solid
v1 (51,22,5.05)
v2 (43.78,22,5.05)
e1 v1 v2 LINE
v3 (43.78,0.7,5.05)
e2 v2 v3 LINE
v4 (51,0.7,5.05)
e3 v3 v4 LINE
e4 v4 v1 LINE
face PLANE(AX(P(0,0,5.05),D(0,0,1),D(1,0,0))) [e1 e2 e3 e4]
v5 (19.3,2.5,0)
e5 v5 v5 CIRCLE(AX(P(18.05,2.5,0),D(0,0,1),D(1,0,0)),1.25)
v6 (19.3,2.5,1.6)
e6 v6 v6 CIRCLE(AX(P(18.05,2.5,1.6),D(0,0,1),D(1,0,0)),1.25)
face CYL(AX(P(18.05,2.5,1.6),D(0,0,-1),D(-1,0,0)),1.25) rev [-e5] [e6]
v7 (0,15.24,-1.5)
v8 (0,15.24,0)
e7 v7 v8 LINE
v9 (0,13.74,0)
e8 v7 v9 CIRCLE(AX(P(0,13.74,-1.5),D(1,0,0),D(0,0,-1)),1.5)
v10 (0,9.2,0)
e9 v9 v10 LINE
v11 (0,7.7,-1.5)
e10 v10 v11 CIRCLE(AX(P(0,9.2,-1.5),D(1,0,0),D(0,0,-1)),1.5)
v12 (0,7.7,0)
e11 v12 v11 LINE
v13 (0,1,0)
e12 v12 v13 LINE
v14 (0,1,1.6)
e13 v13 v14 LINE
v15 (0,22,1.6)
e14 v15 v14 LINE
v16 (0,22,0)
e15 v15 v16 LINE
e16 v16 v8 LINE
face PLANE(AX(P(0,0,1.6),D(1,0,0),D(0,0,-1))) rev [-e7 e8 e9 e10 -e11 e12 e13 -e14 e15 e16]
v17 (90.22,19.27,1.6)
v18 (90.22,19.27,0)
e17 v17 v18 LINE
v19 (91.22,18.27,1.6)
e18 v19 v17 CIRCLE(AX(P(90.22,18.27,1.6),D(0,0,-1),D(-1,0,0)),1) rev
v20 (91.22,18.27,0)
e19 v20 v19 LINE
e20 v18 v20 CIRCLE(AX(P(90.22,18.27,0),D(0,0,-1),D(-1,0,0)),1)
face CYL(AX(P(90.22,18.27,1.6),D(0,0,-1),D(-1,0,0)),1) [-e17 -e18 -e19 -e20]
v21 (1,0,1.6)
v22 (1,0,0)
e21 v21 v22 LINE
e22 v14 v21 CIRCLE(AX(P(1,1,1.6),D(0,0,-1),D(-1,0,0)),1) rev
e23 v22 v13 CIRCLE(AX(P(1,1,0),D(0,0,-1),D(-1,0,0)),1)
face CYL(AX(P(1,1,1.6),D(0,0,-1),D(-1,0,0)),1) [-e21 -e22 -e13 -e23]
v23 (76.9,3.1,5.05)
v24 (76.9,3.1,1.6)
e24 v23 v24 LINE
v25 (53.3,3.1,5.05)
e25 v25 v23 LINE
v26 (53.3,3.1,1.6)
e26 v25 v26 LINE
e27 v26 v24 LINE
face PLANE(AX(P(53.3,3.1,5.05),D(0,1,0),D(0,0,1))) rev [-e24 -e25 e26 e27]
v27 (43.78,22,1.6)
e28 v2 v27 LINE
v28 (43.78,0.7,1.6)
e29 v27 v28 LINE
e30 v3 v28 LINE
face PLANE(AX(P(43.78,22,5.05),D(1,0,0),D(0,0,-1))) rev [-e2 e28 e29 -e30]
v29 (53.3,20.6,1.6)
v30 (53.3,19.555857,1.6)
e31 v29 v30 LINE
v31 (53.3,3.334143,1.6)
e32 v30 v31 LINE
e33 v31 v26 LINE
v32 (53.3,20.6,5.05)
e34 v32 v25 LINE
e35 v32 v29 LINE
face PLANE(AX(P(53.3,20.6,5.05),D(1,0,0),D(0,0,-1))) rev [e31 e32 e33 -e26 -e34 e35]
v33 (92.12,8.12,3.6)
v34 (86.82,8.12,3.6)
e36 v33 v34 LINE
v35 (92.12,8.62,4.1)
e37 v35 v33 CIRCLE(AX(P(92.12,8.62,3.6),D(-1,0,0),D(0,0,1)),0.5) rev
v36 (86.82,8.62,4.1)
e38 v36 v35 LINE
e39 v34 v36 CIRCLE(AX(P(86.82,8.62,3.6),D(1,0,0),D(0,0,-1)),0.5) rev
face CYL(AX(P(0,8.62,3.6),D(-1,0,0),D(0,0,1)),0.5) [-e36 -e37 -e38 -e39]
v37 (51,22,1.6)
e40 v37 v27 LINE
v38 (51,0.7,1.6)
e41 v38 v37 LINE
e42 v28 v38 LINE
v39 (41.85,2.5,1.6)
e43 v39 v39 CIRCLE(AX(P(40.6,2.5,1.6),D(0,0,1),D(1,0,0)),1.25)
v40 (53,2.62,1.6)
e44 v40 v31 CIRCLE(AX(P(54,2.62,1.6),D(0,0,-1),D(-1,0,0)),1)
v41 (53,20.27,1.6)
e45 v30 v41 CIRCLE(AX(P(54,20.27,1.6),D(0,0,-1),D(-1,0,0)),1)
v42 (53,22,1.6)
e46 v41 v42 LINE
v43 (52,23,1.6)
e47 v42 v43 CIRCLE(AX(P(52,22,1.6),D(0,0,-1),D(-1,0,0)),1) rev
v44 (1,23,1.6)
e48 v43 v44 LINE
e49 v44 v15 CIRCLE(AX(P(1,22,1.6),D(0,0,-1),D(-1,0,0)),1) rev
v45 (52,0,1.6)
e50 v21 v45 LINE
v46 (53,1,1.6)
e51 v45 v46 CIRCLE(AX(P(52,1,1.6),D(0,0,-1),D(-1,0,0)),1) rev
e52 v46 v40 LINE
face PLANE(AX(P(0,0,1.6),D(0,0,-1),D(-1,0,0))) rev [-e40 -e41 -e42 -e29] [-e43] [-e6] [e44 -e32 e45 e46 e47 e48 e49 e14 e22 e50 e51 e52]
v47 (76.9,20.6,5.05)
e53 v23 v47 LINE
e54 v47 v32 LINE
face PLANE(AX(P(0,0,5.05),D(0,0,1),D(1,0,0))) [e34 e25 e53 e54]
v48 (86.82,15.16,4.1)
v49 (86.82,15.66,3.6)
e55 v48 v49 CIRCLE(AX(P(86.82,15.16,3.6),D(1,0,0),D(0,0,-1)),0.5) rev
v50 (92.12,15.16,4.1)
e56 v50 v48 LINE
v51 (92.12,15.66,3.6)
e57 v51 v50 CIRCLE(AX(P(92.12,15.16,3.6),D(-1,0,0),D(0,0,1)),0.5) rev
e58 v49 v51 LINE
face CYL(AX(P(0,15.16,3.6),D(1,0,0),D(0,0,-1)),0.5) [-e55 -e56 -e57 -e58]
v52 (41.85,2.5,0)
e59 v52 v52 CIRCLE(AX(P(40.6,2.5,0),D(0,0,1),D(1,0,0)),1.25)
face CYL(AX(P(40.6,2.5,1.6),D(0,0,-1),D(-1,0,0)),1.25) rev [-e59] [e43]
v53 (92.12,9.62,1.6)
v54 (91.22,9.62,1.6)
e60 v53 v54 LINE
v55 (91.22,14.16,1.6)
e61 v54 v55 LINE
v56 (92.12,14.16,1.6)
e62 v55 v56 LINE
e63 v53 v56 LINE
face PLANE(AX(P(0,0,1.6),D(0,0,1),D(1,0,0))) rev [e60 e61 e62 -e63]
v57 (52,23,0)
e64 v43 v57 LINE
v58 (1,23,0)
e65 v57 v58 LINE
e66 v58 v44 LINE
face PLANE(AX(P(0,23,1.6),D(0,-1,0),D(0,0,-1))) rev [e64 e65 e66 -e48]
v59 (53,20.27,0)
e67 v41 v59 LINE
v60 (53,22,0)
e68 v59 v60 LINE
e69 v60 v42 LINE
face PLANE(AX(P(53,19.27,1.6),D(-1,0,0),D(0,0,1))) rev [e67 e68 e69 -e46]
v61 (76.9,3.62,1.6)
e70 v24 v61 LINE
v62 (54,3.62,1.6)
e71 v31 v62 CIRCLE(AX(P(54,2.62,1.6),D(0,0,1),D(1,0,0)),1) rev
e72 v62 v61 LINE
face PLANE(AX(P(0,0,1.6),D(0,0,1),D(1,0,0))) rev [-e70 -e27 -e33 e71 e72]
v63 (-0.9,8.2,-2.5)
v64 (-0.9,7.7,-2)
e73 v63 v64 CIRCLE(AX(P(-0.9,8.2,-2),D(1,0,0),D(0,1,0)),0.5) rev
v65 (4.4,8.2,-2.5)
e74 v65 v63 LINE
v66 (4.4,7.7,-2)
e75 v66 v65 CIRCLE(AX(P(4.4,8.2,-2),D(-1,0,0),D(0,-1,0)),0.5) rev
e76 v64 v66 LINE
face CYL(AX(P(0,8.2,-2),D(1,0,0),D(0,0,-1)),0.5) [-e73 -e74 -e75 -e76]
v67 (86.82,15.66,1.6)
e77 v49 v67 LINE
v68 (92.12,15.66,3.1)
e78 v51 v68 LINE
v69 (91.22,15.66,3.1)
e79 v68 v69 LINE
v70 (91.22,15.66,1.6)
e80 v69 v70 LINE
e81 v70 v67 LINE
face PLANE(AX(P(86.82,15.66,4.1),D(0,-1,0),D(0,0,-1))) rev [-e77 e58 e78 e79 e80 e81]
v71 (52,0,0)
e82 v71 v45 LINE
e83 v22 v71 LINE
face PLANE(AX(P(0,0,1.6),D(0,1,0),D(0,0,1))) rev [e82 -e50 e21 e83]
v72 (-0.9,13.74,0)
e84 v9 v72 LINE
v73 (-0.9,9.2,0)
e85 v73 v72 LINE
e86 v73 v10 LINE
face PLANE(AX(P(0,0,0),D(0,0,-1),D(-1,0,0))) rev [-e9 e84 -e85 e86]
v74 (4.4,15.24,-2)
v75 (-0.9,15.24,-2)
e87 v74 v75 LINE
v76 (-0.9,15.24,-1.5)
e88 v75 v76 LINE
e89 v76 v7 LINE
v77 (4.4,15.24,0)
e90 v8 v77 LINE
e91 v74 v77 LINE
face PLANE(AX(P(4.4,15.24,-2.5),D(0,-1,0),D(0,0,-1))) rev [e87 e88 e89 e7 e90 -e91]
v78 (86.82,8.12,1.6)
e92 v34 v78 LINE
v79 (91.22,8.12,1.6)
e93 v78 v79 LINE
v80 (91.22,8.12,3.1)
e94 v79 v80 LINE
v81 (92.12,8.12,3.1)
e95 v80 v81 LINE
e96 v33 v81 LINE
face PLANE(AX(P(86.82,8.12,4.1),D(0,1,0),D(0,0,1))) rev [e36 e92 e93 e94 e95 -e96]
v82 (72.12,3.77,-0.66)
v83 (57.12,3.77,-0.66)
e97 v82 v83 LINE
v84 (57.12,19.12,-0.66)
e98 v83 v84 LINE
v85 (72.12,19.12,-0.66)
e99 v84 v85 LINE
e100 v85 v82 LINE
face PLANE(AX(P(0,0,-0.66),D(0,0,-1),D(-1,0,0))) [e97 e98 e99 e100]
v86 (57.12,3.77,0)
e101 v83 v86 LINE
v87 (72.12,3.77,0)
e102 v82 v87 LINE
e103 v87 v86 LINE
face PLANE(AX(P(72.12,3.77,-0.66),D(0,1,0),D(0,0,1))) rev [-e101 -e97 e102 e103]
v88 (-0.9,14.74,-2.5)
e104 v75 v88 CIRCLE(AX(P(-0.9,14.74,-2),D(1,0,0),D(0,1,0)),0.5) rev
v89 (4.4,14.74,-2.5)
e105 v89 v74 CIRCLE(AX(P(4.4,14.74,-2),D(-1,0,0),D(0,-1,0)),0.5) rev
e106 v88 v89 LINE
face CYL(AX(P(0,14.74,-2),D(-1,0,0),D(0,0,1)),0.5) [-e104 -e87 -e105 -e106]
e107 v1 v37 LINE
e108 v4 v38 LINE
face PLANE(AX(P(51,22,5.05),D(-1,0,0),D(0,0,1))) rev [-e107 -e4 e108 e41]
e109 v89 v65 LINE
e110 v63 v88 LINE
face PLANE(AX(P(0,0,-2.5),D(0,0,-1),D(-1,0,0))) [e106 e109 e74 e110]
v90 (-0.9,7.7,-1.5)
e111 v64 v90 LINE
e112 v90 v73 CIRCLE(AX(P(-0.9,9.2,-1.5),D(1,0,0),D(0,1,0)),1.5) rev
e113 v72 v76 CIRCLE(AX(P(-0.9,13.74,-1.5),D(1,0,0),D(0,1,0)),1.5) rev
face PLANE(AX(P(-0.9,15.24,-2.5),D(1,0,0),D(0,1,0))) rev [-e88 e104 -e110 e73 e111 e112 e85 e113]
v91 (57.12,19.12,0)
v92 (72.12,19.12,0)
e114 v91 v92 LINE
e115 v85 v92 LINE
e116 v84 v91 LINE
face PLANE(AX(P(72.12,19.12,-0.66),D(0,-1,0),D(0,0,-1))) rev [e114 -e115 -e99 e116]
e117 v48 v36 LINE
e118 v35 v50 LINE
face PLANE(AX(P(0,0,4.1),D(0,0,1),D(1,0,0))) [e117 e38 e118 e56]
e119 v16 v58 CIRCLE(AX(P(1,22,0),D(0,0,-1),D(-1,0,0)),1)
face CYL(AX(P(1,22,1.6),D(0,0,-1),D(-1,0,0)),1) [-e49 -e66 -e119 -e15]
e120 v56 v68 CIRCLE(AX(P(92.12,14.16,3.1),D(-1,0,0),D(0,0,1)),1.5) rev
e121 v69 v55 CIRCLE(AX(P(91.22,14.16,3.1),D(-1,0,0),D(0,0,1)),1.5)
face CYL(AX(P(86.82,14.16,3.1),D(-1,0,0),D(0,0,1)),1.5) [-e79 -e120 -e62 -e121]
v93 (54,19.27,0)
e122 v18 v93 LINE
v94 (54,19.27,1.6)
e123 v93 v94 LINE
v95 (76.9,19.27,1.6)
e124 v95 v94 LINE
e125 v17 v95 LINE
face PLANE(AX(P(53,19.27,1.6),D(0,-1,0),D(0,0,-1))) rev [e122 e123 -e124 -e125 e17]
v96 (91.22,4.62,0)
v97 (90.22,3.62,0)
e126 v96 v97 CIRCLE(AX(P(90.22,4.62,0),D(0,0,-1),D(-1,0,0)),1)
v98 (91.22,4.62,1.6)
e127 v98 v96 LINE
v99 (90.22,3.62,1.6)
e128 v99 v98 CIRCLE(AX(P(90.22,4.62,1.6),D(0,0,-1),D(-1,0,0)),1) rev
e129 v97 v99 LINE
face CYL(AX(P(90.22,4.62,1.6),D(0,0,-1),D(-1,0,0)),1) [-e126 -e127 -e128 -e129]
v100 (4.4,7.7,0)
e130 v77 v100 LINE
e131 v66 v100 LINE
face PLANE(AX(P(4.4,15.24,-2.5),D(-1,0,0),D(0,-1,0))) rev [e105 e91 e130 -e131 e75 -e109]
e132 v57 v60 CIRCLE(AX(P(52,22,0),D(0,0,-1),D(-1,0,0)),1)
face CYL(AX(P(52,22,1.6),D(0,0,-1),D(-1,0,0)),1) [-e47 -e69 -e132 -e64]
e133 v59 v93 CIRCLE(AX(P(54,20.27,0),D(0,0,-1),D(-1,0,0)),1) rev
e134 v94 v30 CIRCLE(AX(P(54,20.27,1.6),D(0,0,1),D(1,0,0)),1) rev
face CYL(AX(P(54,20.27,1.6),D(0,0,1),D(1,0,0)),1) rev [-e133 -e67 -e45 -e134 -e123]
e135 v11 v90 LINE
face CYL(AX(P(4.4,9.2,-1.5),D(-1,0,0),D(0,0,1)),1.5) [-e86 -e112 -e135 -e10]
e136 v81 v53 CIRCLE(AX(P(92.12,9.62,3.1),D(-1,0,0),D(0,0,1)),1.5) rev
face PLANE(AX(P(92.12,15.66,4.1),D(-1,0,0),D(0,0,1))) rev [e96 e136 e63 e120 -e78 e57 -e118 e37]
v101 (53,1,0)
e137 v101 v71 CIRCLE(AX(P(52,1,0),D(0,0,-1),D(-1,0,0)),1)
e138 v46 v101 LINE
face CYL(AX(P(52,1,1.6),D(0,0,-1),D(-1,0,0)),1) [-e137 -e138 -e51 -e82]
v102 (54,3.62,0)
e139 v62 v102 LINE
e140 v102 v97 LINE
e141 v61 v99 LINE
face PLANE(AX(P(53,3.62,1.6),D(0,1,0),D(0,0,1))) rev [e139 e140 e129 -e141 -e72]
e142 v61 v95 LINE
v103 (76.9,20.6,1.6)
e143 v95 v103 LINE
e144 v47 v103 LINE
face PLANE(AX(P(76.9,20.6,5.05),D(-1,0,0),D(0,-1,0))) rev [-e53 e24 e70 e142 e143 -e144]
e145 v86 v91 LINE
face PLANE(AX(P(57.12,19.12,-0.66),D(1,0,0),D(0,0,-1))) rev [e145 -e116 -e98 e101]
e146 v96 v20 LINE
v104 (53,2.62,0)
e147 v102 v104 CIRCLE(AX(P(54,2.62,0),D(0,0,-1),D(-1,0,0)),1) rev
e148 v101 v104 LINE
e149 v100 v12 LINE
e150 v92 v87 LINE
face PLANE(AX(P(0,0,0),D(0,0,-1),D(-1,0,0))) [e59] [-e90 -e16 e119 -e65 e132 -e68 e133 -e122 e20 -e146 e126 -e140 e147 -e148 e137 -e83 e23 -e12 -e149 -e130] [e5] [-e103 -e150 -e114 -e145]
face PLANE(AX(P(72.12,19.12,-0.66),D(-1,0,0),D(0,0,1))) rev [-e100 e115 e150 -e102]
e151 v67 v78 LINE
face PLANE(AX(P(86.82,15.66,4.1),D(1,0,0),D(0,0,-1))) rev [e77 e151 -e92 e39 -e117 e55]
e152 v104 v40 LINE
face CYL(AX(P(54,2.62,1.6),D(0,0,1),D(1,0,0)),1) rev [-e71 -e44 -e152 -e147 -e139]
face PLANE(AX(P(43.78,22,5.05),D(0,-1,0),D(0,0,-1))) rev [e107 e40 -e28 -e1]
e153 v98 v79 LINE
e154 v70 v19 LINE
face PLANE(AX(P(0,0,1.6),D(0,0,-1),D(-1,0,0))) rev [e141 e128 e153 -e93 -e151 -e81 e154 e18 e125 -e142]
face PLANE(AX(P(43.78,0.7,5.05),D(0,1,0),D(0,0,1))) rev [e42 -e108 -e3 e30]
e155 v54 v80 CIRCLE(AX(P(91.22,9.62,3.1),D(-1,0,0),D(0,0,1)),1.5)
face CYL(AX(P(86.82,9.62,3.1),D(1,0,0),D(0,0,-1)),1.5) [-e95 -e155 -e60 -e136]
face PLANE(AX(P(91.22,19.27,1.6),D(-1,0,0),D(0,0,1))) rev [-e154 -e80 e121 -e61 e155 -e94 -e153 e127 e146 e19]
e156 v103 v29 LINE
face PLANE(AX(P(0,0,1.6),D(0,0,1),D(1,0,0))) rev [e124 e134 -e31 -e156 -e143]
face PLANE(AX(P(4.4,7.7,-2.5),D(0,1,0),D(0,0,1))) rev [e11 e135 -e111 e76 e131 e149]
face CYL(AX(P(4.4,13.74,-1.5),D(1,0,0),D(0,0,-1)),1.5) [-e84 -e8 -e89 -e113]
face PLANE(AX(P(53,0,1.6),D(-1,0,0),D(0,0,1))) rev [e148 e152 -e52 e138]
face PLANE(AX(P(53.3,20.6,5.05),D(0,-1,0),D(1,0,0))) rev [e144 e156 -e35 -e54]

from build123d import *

# Parameters (mm, degrees)
SKETCH1_R           = 1.25
BOSS_EXTRUDE2_DEPTH = 1.6
SKETCH2_W           = 15
SKETCH2_H           = 15.35
BOSS_EXTRUDE3_DEPTH = 0.66
SKETCH3_W           = 5.3
SKETCH3_H           = 7.54
BOSS_EXTRUDE4_DEPTH = 2.5
FILLET1_R           = 0.5
FILLET2_R           = 1.5
SKETCH4_W           = 5.3
SKETCH4_H           = 7.54
BOSS_EXTRUDE5_DEPTH = 2.5
FILLET3_R           = 0.5
FILLET4_R           = 1.5
SKETCH5_W           = 7.22
SKETCH5_H           = 21.3
SKETCH5_W_2         = 23.6
SKETCH5_H_2         = 17.5
BOSS_EXTRUDE6_DEPTH = 3.45
FILLET5_R           = 1


with BuildPart() as part:
    # Sketch1 → Boss-Extrude2 (new body)
    with BuildSketch(Plane.XY):
        Polygon((0, 0), (53, 0), (53, 3.62), (91.22, 3.62), (91.22, 19.27), (53, 19.27), (53, 23), (0, 23), align=None)
        with Locations((40.6, 2.5)):
            Circle(SKETCH1_R, mode=Mode.SUBTRACT)
        with Locations((18.05, 2.5)):
            Circle(SKETCH1_R, mode=Mode.SUBTRACT)
    extrude(amount=BOSS_EXTRUDE2_DEPTH)

    # Sketch2 → Boss-Extrude3 (add)
    with BuildSketch(Plane(origin=(0, 0, 0), x_dir=(-1, 0, 0), z_dir=(0, 0, -1))):
        with Locations((-64.62, 11.445)):
            Rectangle(SKETCH2_W, SKETCH2_H)
    extrude(amount=BOSS_EXTRUDE3_DEPTH)

    # Sketch3 → Boss-Extrude4 (add)
    with BuildSketch(Plane.XY.offset(1.6)):
        with Locations((89.47, 11.89)):
            Rectangle(SKETCH3_W, SKETCH3_H)
    extrude(amount=BOSS_EXTRUDE4_DEPTH)

    # Fillet1
    fillet1_edges = [part.edges().sort_by_distance(p)[0] for p in [
        (89.47, 15.66, 4.1),
        (89.47, 8.12, 4.1),
    ]]
    fillet(fillet1_edges, radius=FILLET1_R)

    # Fillet2
    fillet2_edges = [part.edges().sort_by_distance(p)[0] for p in [
        (91.67, 15.66, 1.6),
        (91.67, 8.12, 1.6),
    ]]
    fillet(fillet2_edges, radius=FILLET2_R)

    # Sketch4 → Boss-Extrude5 (add)
    with BuildSketch(Plane(origin=(0, 0, 0), x_dir=(-1, 0, 0), z_dir=(0, 0, -1))):
        with Locations((-1.75, 11.47)):
            Rectangle(SKETCH4_W, SKETCH4_H)
    extrude(amount=BOSS_EXTRUDE5_DEPTH)

    # Fillet3
    fillet3_edges = [part.edges().sort_by_distance(p)[0] for p in [
        (1.75, 15.24, -2.5),
        (1.75, 7.7, -2.5),
    ]]
    fillet(fillet3_edges, radius=FILLET3_R)

    # Fillet4
    fillet4_edges = [part.edges().sort_by_distance(p)[0] for p in [
        (-0.45, 15.24, 0),
        (-0.45, 7.7, 0),
    ]]
    fillet(fillet4_edges, radius=FILLET4_R)

    # Sketch5 → Boss-Extrude6 (add)
    with BuildSketch(Plane.XY.offset(1.6)):
        with Locations((47.39, 11.35)):
            Rectangle(SKETCH5_W, SKETCH5_H)
        with Locations((65.1, 11.85)):
            Rectangle(SKETCH5_W_2, SKETCH5_H_2)
    extrude(amount=BOSS_EXTRUDE6_DEPTH)

    # Fillet5
    # the kernel refuses this fillet: 1 mm, written as the material it adds along each edge
    with BuildSketch(Plane(origin=(53, 19.27, 0), x_dir=(0, 1, 0), z_dir=(0, 0, 1)), Plane(origin=(53, 3.62, 0), x_dir=(1, 0, 0), z_dir=(0, 0, 1))) as fillet5_piece_1:
        with BuildLine():
            CenterArc((FILLET5_R, -FILLET5_R), FILLET5_R, 90, 90)
            Line((0, -FILLET5_R), (0, 0))
            Line((0, 0), (FILLET5_R, 0))
        make_face()
    extrude(amount=1.6)
    # the kernel refuses this fillet: 1 mm, written as the material it takes off along each edge
    with BuildSketch(Plane(origin=(0, 23, -2.5), x_dir=(1, 0, 0), z_dir=(0, 0, 1))) as fillet5_2_piece_1:
        with BuildLine():
            CenterArc((FILLET5_R, -FILLET5_R), FILLET5_R, 90, 90)
            Line((0, -FILLET5_R), (0, 0))
            Line((0, 0), (FILLET5_R, 0))
        make_face()
    extrude(amount=6.6, mode=Mode.SUBTRACT)
    with BuildSketch(Plane(origin=(53, 23, -2.5), x_dir=(-1, 0, 0), z_dir=(0, 0, 1)), Plane(origin=(91.22, 19.27, -2.5), x_dir=(-1, 0, 0), z_dir=(0, 0, 1)), Plane(origin=(91.22, 3.62, -2.5), x_dir=(0, 1, 0), z_dir=(0, 0, 1)), Plane(origin=(53, 0, -2.5), x_dir=(0, 1, 0), z_dir=(0, 0, 1)), Plane(origin=(0, 0, -2.5), x_dir=(1, 0, 0), z_dir=(0, 0, 1))) as fillet5_2_piece_2:
        with BuildLine():
            CenterArc((FILLET5_R, FILLET5_R), FILLET5_R, 180, 90)
            Line((0, FILLET5_R), (0, 0))
            Line((0, 0), (FILLET5_R, 0))
        make_face()
    extrude(amount=6.6, mode=Mode.SUBTRACT)


solid = part.part
